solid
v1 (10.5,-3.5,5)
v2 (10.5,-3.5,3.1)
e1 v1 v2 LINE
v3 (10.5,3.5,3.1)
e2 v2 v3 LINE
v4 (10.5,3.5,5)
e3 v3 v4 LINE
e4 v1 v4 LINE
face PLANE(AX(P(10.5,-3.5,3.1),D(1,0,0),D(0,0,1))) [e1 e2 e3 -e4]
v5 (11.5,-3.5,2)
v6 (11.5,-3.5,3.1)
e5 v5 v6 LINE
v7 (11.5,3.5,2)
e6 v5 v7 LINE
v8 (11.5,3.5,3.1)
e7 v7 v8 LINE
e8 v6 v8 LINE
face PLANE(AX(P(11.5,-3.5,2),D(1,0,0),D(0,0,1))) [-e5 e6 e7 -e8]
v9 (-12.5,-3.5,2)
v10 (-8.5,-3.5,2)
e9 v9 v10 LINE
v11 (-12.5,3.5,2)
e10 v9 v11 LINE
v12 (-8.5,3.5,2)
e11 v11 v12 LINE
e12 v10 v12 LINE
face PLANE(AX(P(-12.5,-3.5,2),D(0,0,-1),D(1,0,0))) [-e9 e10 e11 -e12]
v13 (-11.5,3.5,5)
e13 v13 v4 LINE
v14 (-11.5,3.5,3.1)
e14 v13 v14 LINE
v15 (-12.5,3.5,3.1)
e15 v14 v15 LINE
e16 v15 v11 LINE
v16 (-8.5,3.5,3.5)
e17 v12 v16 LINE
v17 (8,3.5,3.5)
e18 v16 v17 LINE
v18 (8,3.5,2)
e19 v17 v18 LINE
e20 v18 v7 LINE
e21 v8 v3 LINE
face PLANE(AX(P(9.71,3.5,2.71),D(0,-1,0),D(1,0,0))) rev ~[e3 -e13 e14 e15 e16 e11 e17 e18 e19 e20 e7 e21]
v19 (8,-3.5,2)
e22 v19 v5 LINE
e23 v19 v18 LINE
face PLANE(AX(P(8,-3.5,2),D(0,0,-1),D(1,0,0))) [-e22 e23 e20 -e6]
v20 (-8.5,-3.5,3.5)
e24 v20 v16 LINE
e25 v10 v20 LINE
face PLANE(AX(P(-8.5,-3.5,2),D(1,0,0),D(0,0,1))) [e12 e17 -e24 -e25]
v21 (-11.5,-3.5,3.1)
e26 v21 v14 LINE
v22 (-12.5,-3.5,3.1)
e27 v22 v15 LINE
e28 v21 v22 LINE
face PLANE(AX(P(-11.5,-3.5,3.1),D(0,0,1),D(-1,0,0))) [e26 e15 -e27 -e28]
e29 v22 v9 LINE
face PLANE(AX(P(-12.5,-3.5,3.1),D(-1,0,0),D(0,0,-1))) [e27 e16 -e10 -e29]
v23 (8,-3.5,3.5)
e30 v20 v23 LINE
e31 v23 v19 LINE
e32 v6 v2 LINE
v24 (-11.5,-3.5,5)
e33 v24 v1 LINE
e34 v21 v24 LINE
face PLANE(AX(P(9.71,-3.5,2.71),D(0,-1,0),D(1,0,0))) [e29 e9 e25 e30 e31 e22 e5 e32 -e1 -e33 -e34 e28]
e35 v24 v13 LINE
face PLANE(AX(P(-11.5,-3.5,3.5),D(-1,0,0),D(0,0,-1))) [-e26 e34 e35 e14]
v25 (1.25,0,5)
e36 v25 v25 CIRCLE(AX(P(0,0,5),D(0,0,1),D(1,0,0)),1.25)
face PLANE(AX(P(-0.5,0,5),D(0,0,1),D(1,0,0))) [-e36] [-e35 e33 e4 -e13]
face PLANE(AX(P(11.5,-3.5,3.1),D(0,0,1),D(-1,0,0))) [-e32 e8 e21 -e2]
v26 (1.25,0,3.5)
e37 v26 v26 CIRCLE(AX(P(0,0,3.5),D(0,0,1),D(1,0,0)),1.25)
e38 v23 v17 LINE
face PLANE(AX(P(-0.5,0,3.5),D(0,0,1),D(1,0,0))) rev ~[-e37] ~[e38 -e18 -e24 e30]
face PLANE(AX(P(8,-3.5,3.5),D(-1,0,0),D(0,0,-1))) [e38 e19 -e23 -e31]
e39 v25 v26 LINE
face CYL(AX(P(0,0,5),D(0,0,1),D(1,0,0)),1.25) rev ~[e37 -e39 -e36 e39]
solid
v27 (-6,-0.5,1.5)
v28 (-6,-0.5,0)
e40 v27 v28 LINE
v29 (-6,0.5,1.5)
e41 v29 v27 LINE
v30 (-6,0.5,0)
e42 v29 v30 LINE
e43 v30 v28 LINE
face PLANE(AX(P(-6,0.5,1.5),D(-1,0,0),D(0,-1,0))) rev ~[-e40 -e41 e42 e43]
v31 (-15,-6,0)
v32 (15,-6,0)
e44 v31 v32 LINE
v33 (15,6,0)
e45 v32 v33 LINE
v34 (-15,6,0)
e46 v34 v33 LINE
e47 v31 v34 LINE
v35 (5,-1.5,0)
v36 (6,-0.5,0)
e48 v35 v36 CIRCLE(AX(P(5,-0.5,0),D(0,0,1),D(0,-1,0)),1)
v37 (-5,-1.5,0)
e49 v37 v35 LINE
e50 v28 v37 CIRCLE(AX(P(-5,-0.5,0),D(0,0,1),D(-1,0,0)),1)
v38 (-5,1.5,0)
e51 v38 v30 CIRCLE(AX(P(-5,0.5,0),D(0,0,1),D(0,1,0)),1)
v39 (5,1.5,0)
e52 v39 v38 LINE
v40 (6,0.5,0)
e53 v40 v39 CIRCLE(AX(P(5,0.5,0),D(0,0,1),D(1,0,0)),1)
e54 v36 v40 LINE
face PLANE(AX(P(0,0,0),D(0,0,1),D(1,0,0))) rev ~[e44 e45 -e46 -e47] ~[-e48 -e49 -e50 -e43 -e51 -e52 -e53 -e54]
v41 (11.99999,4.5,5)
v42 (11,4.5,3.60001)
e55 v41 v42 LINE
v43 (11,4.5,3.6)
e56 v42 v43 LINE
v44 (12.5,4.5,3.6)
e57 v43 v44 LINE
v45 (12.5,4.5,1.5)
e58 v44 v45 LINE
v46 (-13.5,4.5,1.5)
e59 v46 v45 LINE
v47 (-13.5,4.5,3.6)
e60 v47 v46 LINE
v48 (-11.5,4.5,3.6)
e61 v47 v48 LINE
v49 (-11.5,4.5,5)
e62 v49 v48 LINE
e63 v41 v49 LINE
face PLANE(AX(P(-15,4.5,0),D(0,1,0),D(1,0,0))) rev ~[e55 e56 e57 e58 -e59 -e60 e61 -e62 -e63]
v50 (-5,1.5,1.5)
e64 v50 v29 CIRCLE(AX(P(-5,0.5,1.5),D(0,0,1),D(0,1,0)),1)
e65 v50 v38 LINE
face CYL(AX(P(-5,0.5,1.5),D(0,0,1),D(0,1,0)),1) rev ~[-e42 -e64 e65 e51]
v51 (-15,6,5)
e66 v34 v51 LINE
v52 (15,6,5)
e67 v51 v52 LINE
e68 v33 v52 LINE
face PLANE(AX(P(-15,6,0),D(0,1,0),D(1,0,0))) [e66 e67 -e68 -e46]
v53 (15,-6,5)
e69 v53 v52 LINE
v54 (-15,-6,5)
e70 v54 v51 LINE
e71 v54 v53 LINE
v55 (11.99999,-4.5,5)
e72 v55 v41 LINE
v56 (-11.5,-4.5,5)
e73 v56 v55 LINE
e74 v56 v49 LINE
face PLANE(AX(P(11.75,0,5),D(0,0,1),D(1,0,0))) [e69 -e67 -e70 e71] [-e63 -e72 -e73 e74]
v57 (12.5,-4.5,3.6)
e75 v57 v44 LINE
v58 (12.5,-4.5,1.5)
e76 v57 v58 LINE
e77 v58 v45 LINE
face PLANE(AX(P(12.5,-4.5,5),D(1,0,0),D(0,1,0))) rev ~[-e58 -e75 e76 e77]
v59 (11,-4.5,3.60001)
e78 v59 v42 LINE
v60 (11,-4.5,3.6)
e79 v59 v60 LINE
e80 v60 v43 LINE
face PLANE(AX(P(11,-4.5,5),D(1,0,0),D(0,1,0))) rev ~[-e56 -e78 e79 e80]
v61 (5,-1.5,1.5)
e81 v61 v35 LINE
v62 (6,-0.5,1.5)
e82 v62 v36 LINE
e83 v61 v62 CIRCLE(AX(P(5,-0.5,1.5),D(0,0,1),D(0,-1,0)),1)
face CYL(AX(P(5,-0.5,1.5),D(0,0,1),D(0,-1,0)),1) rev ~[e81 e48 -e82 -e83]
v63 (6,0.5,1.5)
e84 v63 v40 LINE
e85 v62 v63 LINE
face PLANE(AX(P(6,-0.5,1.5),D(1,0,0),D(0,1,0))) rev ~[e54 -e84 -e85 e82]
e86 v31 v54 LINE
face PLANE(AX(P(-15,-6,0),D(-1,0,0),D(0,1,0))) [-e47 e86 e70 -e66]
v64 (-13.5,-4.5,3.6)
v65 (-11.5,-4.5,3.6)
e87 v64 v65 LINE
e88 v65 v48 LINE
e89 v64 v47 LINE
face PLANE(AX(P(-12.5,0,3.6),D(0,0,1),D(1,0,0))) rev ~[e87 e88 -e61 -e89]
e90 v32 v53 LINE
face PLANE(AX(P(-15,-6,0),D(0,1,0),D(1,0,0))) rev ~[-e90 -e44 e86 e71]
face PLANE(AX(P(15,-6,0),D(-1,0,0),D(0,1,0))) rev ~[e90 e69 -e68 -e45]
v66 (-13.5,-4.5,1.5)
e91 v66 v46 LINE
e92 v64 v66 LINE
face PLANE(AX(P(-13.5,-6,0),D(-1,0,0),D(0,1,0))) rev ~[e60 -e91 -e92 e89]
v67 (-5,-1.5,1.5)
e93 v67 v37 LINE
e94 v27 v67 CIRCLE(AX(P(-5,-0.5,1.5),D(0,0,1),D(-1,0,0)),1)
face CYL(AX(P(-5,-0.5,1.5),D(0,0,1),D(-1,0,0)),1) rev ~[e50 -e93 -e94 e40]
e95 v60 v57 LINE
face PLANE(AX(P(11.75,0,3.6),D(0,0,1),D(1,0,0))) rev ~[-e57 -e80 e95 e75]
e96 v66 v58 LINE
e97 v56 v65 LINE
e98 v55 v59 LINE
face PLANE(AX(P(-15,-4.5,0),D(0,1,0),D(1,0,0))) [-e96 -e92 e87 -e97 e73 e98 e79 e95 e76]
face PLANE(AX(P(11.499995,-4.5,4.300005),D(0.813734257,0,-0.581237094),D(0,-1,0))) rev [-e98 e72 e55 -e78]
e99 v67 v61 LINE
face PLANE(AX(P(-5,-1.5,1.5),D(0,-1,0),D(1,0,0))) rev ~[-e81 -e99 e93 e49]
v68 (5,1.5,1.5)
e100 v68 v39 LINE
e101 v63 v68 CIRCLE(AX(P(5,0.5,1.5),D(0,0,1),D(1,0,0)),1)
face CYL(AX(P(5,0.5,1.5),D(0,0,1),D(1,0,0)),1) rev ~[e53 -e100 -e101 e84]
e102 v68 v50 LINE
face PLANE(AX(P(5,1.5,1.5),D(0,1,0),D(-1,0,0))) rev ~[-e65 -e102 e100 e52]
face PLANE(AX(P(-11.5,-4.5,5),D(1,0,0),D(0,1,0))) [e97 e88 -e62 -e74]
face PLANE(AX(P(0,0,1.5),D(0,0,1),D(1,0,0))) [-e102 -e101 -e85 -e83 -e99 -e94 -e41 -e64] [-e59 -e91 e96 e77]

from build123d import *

# Parameters (mm, degrees)
F0_W      = 30
F0_H      = 12
F1_DEPTH  = 5
F2_T      = -1.5
F3_W      = 2
F3_H      = 9
F4_DEPTH  = 1.4
F5_W      = 1
F5_H      = 9
F6_DEPTH  = 3.5
F8_DEPTH  = 1.501
F9_W      = 1.5
F9_H      = 9
F10_DEPTH = 1.4
F11_SIZE2 = 1.39999
F11_SIZE  = 0.99999
F12_W     = 22
F12_H     = 7
F12_R     = 1.25
F13_DEPTH = 1.5
F15_DEPTH = 7
F17_DEPTH = 7


# Not quite as in the source:
# - a fillet or chamfer is up to 0.001 mm smaller than in the source, because OpenCascade refuses the exact size


with BuildPart() as f1:
    # F0 (on Top) → F1 (new body)
    with BuildSketch(Plane.XY):
        Rectangle(F0_W, F0_H)
    extrude(amount=F1_DEPTH)

    # F2
    f2_openings = [f1.faces().sort_by_distance(p)[0] for p in [
        (0, 0, 5),
    ]]
    offset(amount=F2_T, openings=f2_openings)

    # F3 (on face) → F4 (join)
    with BuildSketch(Plane.XY.offset(5)):
        with Locations((-12.5, 0)):
            Rectangle(F3_W, F3_H)
    extrude(amount=-F4_DEPTH)

    # F5 (on face) → F6 (join, through all)
    with BuildSketch(Plane.XY.offset(5)):
        with Locations((13, 0)):
            Rectangle(F5_W, F5_H)
    extrude(amount=-F6_DEPTH)

    # F7 (on face) → F8 (cut, through all)
    with BuildSketch(Plane.XY.offset(1.5)):
        with BuildLine():
            Line((5, 1.5), (-5, 1.5))
            ThreePointArc((-5, 1.5), (-5.7071067812, 1.2071067812), (-6, 0.5))
            Line((-6, 0.5), (-6, -0.5))
            ThreePointArc((-6, -0.5), (-5.7071067812, -1.2071067812), (-5, -1.5))
            Line((-5, -1.5), (5, -1.5))
            ThreePointArc((5, -1.5), (5.7071067812, -1.2071067812), (6, -0.5))
            Line((6, -0.5), (6, 0.5))
            ThreePointArc((6, 0.5), (5.7071067812, 1.2071067812), (5, 1.5))
        make_face()
    extrude(amount=-F8_DEPTH, mode=Mode.SUBTRACT)

    # F9 (on face) → F10 (join)
    with BuildSketch(Plane.XY.offset(5)):
        with Locations((11.75, 0)):
            Rectangle(F9_W, F9_H)
    extrude(amount=-F10_DEPTH)

    # F11 (size 1 and 1.4 in the source; OpenCascade refuses exactly that, so slightly less here)
    f11_edges = [f1.edges().sort_by_distance(p)[0] for p in [
        (11, 0, 5),
    ]]
    f11_side = f1.faces().sort_by_distance((0, 5.67689, 5))[0]
    chamfer(f11_edges, length=F11_SIZE, length2=F11_SIZE2, reference=f11_side)


with BuildPart() as f13:
    # F12 (on face) → F13 (new body)
    with BuildSketch(Plane.XY.offset(5)):
        with Locations((-0.5, 0)):
            Rectangle(F12_W, F12_H)
        Circle(F12_R, mode=Mode.SUBTRACT)
    extrude(amount=-F13_DEPTH)

    # F14 (on face) → F15 (join, through all)
    with BuildSketch(Plane.XZ.offset(3.5)):
        Polygon((-8.5, 3.5), (-11.5, 3.5), (-11.5, 3.1), (-12.5, 3.1), (-12.5, 2), (-8.5, 2), align=None)
    extrude(amount=-F15_DEPTH)

    # F16 (on face) → F17 (join, through all)
    with BuildSketch(Plane.XZ.offset(3.5)):
        Polygon((10.5, 3.1), (10.5, 3.5), (8, 3.5), (8, 2), (11.5, 2), (11.5, 3.1), align=None)
    extrude(amount=-F17_DEPTH)


solid = Compound([f1.part, f13.part])
